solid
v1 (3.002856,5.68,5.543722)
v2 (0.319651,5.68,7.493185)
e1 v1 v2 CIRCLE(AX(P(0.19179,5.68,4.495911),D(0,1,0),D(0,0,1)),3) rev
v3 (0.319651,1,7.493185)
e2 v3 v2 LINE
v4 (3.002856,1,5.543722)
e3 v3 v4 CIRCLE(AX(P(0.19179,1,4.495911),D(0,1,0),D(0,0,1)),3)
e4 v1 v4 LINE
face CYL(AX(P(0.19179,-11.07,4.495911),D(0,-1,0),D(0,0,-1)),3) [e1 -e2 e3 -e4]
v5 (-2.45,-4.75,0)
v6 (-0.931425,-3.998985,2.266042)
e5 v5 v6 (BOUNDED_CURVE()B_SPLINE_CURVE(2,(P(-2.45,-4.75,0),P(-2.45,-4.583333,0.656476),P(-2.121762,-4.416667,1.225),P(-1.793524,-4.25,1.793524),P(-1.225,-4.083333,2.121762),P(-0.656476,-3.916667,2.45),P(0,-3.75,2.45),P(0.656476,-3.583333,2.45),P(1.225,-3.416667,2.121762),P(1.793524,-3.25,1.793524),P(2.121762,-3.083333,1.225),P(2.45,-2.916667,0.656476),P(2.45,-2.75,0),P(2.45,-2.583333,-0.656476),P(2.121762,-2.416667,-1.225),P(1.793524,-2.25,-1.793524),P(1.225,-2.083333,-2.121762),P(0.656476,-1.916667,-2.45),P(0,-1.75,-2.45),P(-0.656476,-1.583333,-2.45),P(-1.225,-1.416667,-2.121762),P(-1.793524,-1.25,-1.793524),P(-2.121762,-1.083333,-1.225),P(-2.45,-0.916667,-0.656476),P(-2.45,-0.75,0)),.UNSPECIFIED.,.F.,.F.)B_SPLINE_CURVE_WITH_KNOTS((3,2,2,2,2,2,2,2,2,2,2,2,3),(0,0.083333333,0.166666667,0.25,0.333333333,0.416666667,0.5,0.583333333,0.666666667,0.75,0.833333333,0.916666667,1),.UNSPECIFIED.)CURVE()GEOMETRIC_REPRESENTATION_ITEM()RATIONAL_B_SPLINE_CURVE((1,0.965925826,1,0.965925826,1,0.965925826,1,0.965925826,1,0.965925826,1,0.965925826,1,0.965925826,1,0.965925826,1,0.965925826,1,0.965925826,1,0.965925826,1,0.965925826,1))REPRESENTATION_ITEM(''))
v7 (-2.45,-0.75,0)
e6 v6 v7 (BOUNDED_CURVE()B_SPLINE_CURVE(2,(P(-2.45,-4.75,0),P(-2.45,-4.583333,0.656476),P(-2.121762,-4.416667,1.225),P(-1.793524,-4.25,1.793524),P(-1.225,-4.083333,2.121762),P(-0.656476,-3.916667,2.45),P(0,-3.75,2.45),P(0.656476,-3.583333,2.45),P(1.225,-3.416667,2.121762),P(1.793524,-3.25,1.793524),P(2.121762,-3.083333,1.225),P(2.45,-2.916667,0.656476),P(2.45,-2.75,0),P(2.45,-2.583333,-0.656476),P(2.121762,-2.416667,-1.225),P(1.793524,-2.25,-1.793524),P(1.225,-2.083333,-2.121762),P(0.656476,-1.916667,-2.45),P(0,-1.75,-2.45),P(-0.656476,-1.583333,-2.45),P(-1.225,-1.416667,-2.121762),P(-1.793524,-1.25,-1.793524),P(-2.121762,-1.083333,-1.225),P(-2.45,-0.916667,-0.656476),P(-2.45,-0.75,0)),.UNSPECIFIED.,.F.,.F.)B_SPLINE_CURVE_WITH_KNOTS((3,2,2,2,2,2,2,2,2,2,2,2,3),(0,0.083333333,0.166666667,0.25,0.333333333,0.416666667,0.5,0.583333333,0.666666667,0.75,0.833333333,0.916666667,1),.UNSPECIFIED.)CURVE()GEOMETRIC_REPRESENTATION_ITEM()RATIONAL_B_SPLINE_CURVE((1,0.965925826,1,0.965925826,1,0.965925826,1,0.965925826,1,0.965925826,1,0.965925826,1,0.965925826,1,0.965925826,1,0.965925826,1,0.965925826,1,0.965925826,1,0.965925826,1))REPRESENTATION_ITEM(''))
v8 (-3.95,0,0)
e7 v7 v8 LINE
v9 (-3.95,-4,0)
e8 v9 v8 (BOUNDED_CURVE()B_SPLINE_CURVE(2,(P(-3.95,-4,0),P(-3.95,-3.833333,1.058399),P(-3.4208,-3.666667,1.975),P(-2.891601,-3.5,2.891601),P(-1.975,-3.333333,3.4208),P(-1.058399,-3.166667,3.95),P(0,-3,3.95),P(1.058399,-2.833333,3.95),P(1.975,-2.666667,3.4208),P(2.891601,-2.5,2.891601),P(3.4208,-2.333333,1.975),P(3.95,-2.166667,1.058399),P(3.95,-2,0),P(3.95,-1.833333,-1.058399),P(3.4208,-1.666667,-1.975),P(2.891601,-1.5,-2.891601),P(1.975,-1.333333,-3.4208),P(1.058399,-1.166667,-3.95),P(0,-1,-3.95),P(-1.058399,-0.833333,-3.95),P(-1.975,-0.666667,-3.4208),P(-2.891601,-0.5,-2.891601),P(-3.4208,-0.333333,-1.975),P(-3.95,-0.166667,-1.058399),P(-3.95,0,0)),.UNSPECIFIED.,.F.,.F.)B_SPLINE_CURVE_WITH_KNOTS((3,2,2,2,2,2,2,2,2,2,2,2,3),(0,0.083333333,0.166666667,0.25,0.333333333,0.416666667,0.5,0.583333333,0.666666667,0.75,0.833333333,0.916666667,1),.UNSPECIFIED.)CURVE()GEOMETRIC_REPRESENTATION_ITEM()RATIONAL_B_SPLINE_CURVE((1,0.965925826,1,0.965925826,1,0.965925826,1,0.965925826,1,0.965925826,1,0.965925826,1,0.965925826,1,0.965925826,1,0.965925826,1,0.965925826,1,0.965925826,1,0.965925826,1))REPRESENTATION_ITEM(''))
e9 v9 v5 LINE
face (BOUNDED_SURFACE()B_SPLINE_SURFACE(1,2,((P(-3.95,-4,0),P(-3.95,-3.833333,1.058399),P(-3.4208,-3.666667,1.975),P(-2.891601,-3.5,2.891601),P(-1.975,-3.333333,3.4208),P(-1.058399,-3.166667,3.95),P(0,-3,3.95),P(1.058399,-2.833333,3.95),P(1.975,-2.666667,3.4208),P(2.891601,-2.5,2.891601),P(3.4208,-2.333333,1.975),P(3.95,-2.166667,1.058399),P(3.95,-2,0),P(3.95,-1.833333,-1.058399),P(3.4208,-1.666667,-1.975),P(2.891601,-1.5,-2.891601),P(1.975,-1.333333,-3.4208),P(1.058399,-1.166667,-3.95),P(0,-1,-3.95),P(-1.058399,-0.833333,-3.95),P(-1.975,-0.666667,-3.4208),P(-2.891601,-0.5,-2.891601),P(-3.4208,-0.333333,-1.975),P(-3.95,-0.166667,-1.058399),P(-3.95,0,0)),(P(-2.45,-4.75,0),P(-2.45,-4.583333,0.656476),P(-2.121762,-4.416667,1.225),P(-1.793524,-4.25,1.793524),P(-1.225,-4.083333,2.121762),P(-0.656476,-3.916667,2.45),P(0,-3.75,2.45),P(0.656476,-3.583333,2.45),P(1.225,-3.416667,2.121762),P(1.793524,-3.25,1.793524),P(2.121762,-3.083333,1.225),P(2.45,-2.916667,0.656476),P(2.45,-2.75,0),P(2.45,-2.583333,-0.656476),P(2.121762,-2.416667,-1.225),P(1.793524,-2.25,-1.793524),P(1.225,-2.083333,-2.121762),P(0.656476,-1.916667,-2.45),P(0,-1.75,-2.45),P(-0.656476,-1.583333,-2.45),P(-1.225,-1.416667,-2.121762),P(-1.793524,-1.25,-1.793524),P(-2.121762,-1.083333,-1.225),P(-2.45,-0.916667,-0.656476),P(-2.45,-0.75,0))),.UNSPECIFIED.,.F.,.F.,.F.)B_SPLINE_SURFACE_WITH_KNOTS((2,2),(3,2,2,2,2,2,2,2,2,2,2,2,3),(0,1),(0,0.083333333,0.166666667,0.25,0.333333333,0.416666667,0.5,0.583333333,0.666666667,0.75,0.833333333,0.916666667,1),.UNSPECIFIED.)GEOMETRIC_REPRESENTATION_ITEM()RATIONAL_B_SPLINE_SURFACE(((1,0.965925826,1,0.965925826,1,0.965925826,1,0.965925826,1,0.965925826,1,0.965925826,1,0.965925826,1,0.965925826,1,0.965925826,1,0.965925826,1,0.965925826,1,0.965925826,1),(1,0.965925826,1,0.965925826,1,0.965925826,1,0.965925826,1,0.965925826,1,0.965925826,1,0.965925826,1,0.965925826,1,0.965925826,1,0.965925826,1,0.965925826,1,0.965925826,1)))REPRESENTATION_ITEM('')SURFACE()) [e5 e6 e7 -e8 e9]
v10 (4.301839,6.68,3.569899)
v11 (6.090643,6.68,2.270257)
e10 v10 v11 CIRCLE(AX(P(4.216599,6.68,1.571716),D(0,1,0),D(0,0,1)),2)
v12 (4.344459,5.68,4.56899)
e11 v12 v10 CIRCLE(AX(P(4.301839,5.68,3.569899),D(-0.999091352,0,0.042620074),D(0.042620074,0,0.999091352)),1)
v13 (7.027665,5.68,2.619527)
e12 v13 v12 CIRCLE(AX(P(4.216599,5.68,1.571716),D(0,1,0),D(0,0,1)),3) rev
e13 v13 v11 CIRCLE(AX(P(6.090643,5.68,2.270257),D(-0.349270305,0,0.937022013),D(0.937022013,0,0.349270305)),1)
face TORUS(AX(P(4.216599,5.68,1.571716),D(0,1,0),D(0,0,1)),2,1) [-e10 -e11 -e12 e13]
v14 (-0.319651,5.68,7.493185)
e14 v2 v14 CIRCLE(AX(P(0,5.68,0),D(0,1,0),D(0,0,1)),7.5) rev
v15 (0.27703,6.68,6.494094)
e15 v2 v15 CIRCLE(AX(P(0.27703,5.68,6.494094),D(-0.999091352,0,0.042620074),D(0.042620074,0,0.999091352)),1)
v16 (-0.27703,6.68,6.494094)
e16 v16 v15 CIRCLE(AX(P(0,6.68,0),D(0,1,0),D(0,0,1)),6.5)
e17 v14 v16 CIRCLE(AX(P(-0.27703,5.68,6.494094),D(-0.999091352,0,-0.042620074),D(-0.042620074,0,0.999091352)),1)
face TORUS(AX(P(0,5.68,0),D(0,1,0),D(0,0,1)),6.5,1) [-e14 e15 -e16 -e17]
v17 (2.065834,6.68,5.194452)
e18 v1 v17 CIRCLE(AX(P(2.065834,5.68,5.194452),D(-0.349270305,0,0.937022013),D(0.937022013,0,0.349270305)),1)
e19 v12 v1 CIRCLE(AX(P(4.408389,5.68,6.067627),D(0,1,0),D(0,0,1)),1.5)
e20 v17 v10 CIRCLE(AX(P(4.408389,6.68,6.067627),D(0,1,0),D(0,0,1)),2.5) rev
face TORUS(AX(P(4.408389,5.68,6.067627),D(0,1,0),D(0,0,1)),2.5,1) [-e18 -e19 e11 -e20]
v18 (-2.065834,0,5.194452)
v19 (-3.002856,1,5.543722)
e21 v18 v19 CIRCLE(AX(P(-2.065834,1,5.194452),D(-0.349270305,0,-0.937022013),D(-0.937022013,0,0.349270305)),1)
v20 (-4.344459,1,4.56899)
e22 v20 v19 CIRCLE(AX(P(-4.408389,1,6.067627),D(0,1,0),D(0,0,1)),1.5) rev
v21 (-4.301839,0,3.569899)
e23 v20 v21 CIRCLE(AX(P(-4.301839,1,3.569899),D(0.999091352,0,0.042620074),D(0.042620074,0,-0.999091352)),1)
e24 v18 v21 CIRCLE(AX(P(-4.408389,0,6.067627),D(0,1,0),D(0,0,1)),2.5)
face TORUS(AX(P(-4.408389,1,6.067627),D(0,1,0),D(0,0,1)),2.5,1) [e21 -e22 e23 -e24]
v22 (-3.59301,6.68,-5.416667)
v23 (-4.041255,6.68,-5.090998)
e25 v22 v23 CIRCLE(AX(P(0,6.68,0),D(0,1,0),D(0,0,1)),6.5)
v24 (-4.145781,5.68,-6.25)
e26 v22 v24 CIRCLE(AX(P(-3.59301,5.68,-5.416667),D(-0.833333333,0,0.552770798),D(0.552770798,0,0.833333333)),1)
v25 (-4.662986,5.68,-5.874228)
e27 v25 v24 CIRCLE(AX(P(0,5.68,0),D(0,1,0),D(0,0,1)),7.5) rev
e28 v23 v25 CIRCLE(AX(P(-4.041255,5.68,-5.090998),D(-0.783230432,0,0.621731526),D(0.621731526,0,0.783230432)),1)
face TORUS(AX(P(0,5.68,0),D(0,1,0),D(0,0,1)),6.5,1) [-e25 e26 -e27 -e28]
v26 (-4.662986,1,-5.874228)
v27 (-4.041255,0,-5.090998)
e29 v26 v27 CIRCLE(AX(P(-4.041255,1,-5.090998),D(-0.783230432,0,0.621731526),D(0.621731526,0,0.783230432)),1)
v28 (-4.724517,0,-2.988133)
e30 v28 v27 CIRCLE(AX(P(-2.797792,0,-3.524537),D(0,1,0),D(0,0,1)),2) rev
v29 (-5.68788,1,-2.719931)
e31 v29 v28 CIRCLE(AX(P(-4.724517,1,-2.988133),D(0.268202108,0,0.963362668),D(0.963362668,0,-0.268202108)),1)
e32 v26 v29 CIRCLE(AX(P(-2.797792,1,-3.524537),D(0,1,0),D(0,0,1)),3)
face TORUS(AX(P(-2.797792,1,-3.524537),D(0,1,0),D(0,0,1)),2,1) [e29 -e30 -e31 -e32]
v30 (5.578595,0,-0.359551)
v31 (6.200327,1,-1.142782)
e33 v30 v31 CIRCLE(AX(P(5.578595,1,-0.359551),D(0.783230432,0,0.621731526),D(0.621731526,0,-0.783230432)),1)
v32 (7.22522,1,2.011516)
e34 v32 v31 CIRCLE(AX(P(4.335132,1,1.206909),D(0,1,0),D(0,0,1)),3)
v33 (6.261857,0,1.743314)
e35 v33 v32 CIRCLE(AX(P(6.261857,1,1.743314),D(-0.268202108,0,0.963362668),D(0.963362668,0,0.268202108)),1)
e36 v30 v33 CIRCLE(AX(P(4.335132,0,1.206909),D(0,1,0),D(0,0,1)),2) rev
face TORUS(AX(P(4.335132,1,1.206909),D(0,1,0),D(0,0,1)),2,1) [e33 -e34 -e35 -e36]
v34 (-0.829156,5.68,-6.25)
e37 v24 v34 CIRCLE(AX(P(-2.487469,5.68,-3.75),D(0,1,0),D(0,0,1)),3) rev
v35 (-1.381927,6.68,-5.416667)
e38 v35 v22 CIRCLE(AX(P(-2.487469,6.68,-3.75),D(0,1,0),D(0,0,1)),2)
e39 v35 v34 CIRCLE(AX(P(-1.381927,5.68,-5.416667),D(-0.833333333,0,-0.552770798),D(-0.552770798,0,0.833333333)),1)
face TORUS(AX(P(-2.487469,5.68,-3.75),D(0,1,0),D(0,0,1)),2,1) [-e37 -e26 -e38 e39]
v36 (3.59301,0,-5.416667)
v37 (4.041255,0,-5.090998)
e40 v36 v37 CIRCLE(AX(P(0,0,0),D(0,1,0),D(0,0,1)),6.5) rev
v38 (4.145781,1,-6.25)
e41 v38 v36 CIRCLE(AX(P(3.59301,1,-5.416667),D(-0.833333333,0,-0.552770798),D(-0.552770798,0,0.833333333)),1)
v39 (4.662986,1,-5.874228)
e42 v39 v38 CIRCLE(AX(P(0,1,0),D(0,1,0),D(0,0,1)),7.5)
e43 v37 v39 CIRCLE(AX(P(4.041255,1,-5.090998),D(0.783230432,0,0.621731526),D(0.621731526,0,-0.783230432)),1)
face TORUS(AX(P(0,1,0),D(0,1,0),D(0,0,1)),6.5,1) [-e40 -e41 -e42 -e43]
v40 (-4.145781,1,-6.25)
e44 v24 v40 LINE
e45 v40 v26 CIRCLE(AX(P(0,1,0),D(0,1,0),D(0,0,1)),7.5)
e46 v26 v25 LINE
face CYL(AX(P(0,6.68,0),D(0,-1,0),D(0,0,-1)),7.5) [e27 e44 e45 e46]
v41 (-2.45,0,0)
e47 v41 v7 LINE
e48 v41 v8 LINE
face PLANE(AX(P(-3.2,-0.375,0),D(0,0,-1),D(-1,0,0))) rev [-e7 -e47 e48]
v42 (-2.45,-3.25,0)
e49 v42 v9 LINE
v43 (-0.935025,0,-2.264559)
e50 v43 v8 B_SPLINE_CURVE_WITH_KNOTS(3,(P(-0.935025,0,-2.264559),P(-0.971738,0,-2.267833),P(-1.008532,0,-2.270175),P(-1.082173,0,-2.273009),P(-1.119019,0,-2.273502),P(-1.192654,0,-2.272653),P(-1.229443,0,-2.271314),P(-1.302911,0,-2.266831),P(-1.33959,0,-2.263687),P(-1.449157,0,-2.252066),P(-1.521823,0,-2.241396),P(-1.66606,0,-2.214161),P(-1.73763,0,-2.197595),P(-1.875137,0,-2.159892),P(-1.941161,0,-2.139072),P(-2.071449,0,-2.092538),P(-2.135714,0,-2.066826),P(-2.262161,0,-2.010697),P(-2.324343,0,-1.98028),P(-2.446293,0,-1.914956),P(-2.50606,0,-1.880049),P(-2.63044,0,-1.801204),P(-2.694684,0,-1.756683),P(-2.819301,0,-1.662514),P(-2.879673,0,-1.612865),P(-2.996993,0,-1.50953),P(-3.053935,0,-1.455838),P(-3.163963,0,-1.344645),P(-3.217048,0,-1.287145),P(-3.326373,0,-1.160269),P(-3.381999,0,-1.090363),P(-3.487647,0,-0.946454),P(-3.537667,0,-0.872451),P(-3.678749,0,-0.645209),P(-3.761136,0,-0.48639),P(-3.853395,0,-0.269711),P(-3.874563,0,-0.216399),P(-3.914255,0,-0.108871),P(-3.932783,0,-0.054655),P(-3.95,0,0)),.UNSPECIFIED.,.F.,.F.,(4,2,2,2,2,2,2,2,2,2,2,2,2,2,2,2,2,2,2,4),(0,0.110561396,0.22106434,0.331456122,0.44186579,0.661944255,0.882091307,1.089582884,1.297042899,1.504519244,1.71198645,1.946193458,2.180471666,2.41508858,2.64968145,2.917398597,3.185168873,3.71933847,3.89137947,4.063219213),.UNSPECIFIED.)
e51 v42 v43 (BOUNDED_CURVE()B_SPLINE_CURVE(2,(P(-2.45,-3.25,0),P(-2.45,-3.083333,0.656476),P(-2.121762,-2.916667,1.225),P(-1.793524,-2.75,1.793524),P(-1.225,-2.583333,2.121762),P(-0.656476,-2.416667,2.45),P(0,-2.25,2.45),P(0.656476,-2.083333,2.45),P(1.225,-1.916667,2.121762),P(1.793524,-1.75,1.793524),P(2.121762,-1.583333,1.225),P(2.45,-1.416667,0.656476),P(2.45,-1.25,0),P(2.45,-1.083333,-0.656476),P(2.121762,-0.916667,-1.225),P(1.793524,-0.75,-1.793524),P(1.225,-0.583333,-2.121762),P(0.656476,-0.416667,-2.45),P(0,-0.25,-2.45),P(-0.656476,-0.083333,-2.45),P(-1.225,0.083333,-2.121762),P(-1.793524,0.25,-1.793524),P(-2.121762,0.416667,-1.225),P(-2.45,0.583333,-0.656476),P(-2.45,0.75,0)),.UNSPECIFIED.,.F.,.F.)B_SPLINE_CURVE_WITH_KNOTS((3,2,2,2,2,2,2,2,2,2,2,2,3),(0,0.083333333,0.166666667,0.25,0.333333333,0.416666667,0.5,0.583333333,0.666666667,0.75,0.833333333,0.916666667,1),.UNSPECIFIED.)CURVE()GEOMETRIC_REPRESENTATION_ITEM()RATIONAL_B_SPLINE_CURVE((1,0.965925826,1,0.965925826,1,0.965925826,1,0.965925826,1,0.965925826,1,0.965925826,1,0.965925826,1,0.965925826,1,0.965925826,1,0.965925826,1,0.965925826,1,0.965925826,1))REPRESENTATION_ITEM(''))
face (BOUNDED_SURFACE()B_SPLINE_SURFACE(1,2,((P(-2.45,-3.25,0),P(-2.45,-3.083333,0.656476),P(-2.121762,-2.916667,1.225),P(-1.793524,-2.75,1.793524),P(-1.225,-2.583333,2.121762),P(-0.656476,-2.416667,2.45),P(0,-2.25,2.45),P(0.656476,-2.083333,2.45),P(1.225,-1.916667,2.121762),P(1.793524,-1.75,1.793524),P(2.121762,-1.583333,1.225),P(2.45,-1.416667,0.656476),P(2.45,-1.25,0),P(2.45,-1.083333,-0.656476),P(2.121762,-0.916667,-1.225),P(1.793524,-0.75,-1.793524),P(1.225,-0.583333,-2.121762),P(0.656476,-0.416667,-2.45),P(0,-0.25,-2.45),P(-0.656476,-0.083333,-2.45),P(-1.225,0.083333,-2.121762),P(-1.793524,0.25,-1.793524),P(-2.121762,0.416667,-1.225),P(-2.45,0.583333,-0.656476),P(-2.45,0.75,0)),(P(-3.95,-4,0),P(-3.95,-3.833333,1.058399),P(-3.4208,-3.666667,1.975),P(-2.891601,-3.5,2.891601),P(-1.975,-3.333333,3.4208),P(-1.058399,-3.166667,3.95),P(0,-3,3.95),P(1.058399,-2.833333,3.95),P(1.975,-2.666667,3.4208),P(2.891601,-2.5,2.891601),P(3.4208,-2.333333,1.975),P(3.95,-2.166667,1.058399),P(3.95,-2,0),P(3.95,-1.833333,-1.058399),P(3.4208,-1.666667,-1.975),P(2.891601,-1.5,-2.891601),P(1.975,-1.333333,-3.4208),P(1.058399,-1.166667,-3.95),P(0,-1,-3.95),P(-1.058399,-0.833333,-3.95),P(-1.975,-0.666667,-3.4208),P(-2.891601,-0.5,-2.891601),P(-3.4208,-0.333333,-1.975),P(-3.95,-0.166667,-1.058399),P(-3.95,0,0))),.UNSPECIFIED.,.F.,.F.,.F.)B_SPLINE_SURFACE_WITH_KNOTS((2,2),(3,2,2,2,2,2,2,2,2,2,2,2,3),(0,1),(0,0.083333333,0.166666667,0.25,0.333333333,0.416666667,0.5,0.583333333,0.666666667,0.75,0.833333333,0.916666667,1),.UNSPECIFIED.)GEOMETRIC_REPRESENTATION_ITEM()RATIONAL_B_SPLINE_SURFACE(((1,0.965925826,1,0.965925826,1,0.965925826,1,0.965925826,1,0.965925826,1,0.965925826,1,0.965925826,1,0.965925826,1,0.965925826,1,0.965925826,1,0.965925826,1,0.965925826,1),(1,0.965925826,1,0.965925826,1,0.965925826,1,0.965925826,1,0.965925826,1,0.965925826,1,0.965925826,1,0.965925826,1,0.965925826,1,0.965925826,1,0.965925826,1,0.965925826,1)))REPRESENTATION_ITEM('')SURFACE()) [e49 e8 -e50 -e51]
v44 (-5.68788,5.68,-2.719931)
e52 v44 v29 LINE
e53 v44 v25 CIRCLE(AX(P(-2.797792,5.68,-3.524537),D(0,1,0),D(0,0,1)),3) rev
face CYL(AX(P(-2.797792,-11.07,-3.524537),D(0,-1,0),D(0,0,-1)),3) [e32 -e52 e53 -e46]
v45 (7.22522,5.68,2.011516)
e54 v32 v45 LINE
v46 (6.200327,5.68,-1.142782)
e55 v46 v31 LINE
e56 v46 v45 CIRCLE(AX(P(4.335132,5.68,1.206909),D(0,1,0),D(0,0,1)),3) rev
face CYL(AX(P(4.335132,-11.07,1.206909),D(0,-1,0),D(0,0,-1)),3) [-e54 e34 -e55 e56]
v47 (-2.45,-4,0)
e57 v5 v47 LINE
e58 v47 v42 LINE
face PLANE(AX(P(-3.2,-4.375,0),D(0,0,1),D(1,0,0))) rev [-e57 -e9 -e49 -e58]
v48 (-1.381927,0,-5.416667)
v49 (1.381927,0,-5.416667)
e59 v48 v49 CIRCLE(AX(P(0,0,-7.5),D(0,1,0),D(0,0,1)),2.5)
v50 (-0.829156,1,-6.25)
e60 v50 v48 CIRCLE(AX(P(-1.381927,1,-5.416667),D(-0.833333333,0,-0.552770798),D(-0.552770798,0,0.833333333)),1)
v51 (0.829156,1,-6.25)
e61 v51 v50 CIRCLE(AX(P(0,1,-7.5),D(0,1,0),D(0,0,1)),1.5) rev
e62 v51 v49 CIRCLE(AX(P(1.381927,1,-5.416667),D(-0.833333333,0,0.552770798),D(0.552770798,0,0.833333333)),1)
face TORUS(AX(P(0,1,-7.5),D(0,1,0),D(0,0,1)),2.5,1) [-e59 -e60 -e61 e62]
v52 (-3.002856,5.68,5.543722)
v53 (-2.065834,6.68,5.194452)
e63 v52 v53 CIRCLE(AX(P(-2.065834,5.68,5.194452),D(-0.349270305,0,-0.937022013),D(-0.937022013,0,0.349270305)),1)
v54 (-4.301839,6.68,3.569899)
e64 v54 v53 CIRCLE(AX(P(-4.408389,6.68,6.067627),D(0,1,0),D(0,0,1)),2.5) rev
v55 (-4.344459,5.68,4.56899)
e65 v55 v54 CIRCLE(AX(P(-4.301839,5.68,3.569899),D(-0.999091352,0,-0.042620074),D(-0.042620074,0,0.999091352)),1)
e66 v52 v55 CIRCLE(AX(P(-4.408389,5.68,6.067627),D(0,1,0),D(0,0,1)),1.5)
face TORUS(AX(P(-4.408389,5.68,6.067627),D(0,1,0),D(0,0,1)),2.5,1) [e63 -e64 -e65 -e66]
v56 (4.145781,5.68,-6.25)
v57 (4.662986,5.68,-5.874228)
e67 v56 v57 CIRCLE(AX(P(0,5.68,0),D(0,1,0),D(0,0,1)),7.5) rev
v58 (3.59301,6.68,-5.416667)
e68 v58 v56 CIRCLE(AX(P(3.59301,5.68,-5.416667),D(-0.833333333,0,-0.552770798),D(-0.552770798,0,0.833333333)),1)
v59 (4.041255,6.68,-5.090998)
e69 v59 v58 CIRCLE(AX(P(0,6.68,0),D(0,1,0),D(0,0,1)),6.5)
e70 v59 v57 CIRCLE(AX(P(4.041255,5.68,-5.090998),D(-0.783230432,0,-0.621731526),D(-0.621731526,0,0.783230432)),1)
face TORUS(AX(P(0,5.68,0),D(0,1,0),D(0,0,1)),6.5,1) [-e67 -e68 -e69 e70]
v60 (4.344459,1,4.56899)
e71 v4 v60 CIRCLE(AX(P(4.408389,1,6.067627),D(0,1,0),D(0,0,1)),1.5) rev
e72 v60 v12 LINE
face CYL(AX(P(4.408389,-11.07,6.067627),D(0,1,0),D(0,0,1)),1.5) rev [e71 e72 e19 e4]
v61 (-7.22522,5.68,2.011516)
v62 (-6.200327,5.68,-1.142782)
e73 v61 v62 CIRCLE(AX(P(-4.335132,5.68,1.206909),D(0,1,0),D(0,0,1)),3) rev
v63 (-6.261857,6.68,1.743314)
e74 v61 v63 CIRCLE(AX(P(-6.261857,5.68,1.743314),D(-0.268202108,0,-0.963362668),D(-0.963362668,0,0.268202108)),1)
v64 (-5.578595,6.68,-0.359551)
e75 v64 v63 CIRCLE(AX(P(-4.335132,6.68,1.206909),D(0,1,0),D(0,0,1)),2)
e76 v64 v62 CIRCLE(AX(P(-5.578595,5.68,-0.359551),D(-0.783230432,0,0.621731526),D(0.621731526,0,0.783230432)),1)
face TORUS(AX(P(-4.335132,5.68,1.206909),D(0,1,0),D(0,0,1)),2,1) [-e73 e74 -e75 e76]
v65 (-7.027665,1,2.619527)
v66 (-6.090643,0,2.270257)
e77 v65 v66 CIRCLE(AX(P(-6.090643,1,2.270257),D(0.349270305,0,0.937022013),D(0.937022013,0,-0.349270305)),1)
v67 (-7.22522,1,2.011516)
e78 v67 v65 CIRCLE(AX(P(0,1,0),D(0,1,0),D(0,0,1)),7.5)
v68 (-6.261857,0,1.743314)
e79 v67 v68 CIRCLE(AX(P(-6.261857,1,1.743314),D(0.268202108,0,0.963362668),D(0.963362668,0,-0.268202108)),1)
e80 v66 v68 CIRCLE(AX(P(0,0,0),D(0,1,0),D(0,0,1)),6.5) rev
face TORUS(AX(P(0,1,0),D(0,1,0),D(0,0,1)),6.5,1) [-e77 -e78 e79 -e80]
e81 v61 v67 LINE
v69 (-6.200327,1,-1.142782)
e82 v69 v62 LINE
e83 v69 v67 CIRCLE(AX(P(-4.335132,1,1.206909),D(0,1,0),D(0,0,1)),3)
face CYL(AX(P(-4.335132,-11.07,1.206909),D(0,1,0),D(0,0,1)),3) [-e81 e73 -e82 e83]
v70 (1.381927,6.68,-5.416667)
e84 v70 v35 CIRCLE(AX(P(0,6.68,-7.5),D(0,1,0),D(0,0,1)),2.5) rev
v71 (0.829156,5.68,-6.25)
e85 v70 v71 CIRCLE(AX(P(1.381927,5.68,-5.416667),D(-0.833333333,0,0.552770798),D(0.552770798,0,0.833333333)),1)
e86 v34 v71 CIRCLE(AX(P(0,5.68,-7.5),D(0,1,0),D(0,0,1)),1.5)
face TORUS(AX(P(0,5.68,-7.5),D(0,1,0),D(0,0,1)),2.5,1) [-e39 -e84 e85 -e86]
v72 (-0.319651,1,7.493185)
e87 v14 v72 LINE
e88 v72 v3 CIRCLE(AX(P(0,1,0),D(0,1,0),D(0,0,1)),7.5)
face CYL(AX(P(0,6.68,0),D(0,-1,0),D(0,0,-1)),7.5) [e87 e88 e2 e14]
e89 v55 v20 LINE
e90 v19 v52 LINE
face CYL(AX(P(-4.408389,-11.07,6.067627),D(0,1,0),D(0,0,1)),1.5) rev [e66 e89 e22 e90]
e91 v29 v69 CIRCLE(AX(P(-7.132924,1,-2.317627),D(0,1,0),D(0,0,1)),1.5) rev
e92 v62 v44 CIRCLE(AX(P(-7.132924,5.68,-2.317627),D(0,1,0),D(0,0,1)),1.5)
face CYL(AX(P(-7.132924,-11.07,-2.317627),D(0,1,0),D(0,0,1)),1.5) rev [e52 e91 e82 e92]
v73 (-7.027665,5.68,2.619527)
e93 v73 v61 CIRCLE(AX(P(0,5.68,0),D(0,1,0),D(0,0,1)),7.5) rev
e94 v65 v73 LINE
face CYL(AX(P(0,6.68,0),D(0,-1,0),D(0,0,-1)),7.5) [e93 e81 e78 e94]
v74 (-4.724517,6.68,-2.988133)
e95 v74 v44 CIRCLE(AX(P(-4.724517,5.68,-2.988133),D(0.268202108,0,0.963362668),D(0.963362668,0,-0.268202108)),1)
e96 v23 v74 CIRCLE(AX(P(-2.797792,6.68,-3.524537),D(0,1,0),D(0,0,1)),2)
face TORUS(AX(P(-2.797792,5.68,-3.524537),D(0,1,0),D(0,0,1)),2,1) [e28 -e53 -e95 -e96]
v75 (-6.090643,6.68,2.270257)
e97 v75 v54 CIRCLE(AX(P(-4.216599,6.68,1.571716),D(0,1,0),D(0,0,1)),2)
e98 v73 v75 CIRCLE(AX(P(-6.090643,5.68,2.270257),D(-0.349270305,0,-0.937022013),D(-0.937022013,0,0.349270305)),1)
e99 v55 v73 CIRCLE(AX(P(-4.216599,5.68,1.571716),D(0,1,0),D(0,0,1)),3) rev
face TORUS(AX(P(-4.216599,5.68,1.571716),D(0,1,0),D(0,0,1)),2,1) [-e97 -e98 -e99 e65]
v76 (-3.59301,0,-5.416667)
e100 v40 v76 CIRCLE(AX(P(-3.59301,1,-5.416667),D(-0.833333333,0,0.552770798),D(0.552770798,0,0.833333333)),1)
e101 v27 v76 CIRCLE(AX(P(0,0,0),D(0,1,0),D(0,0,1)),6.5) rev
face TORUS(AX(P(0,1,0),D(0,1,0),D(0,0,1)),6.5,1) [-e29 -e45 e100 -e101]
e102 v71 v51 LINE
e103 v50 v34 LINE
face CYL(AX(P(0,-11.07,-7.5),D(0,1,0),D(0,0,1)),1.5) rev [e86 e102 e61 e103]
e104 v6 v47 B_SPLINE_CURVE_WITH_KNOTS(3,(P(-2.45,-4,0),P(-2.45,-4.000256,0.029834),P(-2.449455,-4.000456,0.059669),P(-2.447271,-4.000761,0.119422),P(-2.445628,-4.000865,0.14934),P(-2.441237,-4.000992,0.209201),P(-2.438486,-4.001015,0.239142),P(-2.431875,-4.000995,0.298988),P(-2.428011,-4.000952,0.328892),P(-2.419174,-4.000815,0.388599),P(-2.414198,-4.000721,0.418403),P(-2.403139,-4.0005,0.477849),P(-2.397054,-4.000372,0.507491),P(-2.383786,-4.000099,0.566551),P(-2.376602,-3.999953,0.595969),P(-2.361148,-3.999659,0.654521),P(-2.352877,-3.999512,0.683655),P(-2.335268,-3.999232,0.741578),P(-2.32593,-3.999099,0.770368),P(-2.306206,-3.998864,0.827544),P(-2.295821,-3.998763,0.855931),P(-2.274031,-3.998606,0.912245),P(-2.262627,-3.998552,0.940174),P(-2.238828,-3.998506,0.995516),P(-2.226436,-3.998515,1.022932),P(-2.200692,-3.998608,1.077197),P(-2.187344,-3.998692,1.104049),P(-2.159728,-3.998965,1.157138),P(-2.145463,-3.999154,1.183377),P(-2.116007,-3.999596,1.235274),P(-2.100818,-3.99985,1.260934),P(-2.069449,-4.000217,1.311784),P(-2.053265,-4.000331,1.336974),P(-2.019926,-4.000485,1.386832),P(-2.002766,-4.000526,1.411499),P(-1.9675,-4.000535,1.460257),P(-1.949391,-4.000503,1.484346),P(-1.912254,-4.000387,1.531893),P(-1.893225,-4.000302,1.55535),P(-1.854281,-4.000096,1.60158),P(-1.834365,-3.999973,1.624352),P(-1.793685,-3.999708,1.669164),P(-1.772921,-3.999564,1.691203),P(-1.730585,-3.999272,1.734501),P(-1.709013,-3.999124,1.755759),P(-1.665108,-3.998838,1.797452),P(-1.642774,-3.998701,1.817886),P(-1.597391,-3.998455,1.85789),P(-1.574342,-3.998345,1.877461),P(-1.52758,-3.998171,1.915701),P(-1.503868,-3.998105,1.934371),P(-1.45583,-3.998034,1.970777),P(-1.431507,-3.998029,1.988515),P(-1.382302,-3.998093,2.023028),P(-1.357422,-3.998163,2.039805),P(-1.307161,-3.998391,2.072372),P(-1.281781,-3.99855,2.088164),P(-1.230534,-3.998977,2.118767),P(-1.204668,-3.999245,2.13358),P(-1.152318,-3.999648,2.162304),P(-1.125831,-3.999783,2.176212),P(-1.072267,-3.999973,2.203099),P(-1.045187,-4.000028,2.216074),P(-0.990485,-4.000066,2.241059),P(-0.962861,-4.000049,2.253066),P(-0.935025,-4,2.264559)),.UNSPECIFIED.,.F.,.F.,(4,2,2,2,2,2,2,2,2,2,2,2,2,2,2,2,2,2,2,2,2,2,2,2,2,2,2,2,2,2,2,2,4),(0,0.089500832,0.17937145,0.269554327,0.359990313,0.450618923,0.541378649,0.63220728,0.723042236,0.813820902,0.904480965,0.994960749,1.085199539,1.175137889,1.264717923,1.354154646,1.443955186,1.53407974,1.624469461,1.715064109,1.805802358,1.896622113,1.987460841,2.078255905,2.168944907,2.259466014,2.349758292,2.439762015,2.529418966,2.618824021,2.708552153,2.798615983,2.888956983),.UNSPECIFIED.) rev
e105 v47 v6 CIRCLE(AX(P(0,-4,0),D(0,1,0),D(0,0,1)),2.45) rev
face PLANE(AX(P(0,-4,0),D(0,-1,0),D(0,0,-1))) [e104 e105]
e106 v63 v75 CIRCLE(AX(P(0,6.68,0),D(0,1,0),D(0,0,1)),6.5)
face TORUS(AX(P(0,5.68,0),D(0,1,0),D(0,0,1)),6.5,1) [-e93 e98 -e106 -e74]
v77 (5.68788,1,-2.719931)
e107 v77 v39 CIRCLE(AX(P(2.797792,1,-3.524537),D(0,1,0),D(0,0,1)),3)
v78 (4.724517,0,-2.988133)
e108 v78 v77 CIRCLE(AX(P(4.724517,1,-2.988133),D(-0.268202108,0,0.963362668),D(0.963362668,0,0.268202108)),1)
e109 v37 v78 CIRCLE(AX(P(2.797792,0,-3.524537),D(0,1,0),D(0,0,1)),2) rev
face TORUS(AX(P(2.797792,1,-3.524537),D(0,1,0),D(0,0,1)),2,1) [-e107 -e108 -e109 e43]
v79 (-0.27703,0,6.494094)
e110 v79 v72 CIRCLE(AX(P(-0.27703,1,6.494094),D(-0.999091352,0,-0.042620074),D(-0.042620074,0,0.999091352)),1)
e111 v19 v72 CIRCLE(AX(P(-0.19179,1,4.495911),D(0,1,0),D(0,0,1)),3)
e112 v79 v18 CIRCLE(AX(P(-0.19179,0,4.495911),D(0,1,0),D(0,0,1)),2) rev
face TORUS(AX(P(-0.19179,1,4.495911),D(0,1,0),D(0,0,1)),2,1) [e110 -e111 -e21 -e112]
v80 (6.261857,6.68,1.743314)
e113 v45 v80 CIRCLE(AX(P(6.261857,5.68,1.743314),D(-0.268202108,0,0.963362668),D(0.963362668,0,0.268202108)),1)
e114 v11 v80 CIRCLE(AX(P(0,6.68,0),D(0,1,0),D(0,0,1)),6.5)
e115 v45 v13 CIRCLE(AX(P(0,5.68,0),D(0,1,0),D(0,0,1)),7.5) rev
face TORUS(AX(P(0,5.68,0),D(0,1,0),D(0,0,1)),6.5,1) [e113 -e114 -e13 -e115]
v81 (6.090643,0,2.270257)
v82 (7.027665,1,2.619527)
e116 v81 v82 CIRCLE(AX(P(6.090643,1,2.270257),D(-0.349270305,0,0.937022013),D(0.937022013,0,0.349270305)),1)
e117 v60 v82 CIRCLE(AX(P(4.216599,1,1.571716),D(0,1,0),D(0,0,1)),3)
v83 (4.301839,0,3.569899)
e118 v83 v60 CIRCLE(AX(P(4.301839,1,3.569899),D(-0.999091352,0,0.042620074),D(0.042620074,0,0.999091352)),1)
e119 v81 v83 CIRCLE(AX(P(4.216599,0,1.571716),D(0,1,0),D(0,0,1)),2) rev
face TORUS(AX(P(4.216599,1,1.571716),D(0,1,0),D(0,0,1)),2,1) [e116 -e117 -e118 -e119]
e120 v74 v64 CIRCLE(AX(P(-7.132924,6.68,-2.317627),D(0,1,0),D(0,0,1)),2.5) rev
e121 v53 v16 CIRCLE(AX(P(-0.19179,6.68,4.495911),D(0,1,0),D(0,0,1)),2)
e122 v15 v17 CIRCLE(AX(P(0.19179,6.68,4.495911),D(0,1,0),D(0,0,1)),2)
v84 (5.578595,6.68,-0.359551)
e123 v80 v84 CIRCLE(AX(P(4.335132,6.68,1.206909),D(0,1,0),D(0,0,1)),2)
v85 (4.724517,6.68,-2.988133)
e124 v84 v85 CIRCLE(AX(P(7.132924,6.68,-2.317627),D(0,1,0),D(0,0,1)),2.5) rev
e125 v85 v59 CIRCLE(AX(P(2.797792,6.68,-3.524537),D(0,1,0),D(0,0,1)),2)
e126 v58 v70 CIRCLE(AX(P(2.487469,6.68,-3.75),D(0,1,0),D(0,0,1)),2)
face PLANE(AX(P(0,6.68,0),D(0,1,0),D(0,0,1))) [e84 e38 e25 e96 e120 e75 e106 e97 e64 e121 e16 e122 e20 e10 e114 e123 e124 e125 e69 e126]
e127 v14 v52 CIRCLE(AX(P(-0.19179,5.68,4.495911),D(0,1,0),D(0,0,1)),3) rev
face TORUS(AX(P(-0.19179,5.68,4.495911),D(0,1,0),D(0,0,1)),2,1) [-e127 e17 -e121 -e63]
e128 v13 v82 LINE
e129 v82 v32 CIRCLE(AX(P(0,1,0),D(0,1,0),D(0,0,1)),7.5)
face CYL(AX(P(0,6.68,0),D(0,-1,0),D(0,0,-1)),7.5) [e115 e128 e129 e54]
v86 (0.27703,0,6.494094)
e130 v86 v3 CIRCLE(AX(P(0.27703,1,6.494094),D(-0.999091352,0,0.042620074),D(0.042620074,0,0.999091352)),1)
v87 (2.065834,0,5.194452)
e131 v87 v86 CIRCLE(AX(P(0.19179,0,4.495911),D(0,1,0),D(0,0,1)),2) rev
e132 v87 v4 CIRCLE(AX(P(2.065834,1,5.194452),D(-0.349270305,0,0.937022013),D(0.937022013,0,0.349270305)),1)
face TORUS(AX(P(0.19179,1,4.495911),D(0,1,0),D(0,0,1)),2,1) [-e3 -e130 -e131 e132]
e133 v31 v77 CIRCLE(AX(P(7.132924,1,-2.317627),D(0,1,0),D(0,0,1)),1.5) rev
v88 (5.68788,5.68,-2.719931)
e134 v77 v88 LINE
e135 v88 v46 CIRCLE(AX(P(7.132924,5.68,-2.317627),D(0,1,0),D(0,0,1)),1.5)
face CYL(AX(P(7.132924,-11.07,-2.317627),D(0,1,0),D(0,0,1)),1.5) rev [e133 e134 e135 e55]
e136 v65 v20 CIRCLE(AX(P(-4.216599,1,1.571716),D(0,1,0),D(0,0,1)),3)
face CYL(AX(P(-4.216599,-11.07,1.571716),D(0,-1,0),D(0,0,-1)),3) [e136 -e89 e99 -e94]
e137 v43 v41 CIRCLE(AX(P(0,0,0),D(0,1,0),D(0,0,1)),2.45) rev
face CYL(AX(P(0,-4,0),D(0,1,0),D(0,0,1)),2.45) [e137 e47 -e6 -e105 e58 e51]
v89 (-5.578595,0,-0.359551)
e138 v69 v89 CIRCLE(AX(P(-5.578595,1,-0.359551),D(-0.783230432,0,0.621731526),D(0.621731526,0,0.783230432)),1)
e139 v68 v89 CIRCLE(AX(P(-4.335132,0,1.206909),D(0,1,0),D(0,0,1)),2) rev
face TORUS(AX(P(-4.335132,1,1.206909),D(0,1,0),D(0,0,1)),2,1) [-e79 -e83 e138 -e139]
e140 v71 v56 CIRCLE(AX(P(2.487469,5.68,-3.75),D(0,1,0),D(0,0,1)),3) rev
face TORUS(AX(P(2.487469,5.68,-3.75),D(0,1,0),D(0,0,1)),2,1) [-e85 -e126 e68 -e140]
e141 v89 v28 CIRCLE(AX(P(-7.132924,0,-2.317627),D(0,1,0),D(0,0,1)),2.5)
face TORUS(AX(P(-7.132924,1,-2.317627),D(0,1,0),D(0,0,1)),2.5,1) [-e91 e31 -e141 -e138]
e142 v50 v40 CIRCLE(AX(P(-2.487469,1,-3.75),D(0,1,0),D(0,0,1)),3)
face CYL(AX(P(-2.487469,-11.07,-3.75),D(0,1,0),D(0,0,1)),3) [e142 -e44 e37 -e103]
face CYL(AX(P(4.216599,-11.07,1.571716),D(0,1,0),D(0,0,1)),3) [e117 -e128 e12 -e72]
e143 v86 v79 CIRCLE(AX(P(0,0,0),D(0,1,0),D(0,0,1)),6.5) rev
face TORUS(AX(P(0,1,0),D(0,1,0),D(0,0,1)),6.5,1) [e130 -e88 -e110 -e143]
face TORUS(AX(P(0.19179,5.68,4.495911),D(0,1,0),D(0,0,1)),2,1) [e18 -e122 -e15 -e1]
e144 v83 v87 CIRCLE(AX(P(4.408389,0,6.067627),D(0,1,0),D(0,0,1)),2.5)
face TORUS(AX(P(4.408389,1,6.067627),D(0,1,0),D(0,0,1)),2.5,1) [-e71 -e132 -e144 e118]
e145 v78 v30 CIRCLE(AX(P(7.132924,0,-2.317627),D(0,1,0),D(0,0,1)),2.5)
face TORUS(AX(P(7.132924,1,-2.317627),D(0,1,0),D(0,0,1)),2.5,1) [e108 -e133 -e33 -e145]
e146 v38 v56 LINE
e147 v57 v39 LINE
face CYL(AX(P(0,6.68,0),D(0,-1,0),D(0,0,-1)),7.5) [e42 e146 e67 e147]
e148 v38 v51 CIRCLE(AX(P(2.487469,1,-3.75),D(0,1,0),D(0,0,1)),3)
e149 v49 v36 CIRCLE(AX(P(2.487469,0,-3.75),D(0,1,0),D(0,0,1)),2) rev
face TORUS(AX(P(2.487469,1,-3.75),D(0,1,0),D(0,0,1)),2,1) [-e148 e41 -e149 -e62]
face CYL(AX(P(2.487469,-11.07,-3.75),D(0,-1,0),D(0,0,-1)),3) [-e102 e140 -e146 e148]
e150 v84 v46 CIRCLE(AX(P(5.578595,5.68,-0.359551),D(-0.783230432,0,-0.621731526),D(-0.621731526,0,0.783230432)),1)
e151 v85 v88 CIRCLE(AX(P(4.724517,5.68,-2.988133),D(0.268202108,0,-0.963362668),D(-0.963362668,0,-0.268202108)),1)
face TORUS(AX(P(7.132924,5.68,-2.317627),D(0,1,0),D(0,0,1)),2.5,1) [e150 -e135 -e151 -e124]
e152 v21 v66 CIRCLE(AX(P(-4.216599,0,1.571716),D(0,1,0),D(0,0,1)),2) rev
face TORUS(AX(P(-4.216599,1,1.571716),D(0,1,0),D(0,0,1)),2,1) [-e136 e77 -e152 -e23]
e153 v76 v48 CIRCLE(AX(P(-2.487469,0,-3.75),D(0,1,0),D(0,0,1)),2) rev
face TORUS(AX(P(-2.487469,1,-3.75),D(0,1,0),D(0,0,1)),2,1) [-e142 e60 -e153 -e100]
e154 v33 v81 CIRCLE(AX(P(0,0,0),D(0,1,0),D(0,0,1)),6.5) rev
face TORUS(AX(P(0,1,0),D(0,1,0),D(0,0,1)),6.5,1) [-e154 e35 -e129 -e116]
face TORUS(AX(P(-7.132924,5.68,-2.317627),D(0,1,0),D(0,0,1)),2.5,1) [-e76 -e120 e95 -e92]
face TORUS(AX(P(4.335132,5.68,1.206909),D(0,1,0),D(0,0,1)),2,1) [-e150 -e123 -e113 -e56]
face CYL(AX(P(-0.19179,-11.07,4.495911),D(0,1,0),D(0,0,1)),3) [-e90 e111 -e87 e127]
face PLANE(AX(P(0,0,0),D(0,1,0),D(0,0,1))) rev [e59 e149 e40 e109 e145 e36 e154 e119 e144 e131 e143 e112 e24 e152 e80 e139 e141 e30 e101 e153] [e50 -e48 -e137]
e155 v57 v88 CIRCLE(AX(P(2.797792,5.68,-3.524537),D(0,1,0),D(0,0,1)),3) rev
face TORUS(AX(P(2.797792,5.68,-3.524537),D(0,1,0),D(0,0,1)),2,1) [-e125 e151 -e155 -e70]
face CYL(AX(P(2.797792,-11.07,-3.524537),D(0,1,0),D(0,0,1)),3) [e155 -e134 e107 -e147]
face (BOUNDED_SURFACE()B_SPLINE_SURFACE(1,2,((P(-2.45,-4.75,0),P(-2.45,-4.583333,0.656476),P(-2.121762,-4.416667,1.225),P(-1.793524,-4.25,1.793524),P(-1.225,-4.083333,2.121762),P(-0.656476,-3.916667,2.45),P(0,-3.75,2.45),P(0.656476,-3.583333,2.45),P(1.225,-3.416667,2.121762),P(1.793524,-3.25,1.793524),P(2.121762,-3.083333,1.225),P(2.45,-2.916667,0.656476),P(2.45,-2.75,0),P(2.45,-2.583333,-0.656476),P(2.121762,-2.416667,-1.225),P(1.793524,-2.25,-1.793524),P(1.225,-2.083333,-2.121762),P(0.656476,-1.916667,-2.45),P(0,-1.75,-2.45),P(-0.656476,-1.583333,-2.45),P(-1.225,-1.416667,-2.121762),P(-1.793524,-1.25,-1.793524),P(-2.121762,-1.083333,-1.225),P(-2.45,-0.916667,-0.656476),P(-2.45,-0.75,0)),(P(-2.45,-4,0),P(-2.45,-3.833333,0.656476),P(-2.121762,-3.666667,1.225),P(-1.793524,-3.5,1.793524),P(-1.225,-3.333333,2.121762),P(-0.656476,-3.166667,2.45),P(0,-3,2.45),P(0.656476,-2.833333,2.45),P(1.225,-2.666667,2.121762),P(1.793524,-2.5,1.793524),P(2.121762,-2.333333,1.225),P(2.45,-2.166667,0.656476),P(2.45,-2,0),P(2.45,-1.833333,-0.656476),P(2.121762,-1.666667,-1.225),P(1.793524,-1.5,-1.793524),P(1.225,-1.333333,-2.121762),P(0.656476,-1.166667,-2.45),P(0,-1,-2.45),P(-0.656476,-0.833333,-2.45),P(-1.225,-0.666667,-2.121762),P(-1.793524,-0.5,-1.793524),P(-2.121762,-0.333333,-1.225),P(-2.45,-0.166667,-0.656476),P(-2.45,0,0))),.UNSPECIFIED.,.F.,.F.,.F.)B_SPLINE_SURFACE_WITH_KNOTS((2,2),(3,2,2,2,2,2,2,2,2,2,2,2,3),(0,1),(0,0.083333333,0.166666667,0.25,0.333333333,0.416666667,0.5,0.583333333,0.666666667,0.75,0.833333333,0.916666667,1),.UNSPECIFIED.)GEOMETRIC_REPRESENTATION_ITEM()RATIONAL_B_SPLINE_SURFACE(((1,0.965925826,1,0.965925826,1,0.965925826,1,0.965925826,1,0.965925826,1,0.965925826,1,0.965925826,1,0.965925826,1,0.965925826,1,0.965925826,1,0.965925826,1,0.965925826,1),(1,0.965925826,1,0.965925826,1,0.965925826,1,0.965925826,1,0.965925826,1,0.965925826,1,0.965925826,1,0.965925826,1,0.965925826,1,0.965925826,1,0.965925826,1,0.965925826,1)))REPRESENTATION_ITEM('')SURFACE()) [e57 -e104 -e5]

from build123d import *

# Parameters (mm, degrees)
SKETCH1_R           = 7.5
BOSS_EXTRUDE1_DEPTH = 6.68
SKETCH2_R           = 2.45
BOSS_EXTRUDE2_DEPTH = 4
SWEEP1_PITCH        = 4
SKETCH6_R           = 1.5
CUT_EXTRUDE1_DEPTH  = 17.75
FILLET2_R           = 3
FILLET3_R           = 1
FILLET4_R           = 1


with BuildPart() as part:
    # Sketch1 → Boss-Extrude1 (new body)
    with BuildSketch(Plane(origin=(0, 0, 0), x_dir=(1, 0, 0), z_dir=(0, 1, 0))):
        with Locations(Location((0, 0, 0), (0, 0, 270))):
            Circle(SKETCH1_R)
    extrude(amount=BOSS_EXTRUDE1_DEPTH)

    # Sketch2 → Boss-Extrude2 (add)
    with BuildSketch(Plane.XZ):
        with Locations(Location((0, 0, 0), (0, 0, 270))):
            Circle(SKETCH2_R)
    extrude(amount=BOSS_EXTRUDE2_DEPTH)

    # Sweep1: the profile of Sketch4 screwed along a right-hand helix of 1 turns, 12 arcs to a turn; built about Z, then put on its axis
    sweep1_z = Axis((0, 0, 0), (0, 0, 1))
    sweep1_corners = [(2.45, 0, 0), (2.45, 0, -0.75), (3.95, 0, 0), (2.45, 0, 0.75)]
    with BuildLine(mode=Mode.PRIVATE) as sweep1_profile:
        Line(sweep1_corners[0], sweep1_corners[1])
        Line(sweep1_corners[1], sweep1_corners[2])
        Line(sweep1_corners[2], sweep1_corners[3])
        Line(sweep1_corners[3], sweep1_corners[0])
    sweep1_cap = Face(sweep1_profile.wire())
    sweep1_turn_angles = [0, 15, 30, 45, 60, 75, 90, 105, 120, 135, 150, 165, 180, 195, 210, 225, 240, 255, 270, 285, 300, 315, 330, 345, 360]
    sweep1_turn_weights = [1, 0.9659258262890683, 1, 0.9659258262890683, 1, 0.9659258262890683, 1, 0.9659258262890683, 1, 0.9659258262890683, 1, 0.9659258262890683, 1, 0.9659258262890683, 1, 0.9659258262890683, 1, 0.9659258262890683, 1, 0.9659258262890683, 1, 0.9659258262890683, 1, 0.9659258262890683, 1]
    sweep1_turn_rails = [Edge.make_bspline([Vector(p[0], p[1], 0).rotate(sweep1_z, sweep1_turn_angles[k]) / sweep1_turn_weights[k] + Vector(0, 0, p[2] + SWEEP1_PITCH * sweep1_turn_angles[k] / 360) for k in range(25)], [0, 0, 0, 1, 1, 2, 2, 3, 3, 4, 4, 5, 5, 6, 6, 7, 7, 8, 8, 9, 9, 10, 10, 11, 11, 12, 12, 12], 2, sweep1_turn_weights) for p in sweep1_corners]
    sweep1_turn_sides = [Face.make_surface_from_curves(sweep1_turn_rails[p[0]], sweep1_turn_rails[p[1]]) for p in [(0, 1), (1, 2), (2, 3), (3, 0)]]
    sweep1 = Plane(origin=(0, -4, 0), x_dir=(-1, 0, 0), z_dir=(0, 1, 0)) * Solid(Shell([*sweep1_turn_sides, sweep1_cap, sweep1_cap.rotate(sweep1_z, 360).moved(Location((0, 0, SWEEP1_PITCH * 360 / 360)))]))
    add(sweep1)

    # Sketch6 → Cut-Extrude1 (cut)
    with BuildSketch(Plane(origin=(0, 6.68, 0), x_dir=(1, 0, 0), z_dir=(0, 1, 0))):
        with Locations((0, 7.5)):
            Circle(SKETCH6_R)
        with Locations((7.132923872, 2.317627458)):
            Circle(SKETCH6_R)
        with Locations((4.408389392, -6.067627458)):
            Circle(SKETCH6_R)
        with Locations((-4.408389392, -6.067627458)):
            Circle(SKETCH6_R)
        with Locations((-7.132923872, 2.317627458)):
            Circle(SKETCH6_R)
    extrude(amount=-CUT_EXTRUDE1_DEPTH, mode=Mode.SUBTRACT)

    # Fillet2
    fillet2_edges = [part.edges().sort_by_distance(p)[0] for p in [
        (1.492481156, 3.34, -7.35),
        (-1.492481156, 3.34, -7.35),
        (7.451467436, 3.34, -0.85184098),
        (6.529063354, 3.34, -3.690708837),
        (3.112778986, 3.34, 6.823533321),
        (5.527664223, 3.34, 5.069016496),
        (-5.527664223, 3.34, 5.069016496),
        (-3.112778986, 3.34, 6.823533321),
        (-6.529063354, 3.34, -3.690708837),
        (-7.451467436, 3.34, -0.85184098),
    ]]
    fillet(fillet2_edges, radius=FILLET2_R)

    # Fillet3
    fillet3_edges = [part.edges().sort_by_distance(p)[0] for p in [
        (-7.132923872, 6.68, 2.317627458),
        (0, 6.68, -6),
        (-4.408389392, 6.68, -6.067627458),
        (-5.706339098, 6.68, -1.854101966),
        (-3.526711514, 6.68, 4.854101966),
        (0, 6.68, 7.5),
        (3.526711514, 6.68, 4.854101966),
        (7.132923872, 6.68, 2.317627458),
        (5.706339098, 6.68, -1.854101966),
        (4.408389392, 6.68, -6.067627458),
        (-7.188301553, 6.68, 0.279858502),
        (-5.650961417, 6.68, -4.451587926),
        (-2.487468593, 6.68, -6.75),
        (2.487468593, 6.68, -6.75),
        (5.650961417, 6.68, -4.451587926),
        (7.188301553, 6.68, 0.279858502),
        (5.979954817, 6.68, 3.998767358),
        (1.955146088, 6.68, 6.922962066),
        (-1.955146088, 6.68, 6.922962066),
        (-5.979954817, 6.68, 3.998767358),
    ]]
    fillet(fillet3_edges, radius=FILLET3_R)

    # Fillet4
    fillet4_edges = [part.edges().sort_by_distance(p)[0] for p in [
        (-7.132923872, 0, 2.317627458),
        (-3.526711514, 0, 4.854101966),
        (-4.408389392, 0, -6.067627458),
        (0, 0, -6),
        (4.408389392, 0, -6.067627458),
        (5.706339098, 0, -1.854101966),
        (7.132923872, 0, 2.317627458),
        (3.526711514, 0, 4.854101966),
        (0, 0, 7.5),
        (-5.706339098, 0, -1.854101966),
        (-7.188301553, 0, 0.279858502),
        (-5.650961417, 0, -4.451587926),
        (-2.487468593, 0, -6.75),
        (2.487468593, 0, -6.75),
        (5.650961417, 0, -4.451587926),
        (7.188301553, 0, 0.279858502),
        (5.979954817, 0, 3.998767358),
        (1.955146088, 0, 6.922962066),
        (-1.955146088, 0, 6.922962066),
        (-5.979954817, 0, 3.998767358),
    ]]
    fillet(fillet4_edges, radius=FILLET4_R)


solid = part.part
